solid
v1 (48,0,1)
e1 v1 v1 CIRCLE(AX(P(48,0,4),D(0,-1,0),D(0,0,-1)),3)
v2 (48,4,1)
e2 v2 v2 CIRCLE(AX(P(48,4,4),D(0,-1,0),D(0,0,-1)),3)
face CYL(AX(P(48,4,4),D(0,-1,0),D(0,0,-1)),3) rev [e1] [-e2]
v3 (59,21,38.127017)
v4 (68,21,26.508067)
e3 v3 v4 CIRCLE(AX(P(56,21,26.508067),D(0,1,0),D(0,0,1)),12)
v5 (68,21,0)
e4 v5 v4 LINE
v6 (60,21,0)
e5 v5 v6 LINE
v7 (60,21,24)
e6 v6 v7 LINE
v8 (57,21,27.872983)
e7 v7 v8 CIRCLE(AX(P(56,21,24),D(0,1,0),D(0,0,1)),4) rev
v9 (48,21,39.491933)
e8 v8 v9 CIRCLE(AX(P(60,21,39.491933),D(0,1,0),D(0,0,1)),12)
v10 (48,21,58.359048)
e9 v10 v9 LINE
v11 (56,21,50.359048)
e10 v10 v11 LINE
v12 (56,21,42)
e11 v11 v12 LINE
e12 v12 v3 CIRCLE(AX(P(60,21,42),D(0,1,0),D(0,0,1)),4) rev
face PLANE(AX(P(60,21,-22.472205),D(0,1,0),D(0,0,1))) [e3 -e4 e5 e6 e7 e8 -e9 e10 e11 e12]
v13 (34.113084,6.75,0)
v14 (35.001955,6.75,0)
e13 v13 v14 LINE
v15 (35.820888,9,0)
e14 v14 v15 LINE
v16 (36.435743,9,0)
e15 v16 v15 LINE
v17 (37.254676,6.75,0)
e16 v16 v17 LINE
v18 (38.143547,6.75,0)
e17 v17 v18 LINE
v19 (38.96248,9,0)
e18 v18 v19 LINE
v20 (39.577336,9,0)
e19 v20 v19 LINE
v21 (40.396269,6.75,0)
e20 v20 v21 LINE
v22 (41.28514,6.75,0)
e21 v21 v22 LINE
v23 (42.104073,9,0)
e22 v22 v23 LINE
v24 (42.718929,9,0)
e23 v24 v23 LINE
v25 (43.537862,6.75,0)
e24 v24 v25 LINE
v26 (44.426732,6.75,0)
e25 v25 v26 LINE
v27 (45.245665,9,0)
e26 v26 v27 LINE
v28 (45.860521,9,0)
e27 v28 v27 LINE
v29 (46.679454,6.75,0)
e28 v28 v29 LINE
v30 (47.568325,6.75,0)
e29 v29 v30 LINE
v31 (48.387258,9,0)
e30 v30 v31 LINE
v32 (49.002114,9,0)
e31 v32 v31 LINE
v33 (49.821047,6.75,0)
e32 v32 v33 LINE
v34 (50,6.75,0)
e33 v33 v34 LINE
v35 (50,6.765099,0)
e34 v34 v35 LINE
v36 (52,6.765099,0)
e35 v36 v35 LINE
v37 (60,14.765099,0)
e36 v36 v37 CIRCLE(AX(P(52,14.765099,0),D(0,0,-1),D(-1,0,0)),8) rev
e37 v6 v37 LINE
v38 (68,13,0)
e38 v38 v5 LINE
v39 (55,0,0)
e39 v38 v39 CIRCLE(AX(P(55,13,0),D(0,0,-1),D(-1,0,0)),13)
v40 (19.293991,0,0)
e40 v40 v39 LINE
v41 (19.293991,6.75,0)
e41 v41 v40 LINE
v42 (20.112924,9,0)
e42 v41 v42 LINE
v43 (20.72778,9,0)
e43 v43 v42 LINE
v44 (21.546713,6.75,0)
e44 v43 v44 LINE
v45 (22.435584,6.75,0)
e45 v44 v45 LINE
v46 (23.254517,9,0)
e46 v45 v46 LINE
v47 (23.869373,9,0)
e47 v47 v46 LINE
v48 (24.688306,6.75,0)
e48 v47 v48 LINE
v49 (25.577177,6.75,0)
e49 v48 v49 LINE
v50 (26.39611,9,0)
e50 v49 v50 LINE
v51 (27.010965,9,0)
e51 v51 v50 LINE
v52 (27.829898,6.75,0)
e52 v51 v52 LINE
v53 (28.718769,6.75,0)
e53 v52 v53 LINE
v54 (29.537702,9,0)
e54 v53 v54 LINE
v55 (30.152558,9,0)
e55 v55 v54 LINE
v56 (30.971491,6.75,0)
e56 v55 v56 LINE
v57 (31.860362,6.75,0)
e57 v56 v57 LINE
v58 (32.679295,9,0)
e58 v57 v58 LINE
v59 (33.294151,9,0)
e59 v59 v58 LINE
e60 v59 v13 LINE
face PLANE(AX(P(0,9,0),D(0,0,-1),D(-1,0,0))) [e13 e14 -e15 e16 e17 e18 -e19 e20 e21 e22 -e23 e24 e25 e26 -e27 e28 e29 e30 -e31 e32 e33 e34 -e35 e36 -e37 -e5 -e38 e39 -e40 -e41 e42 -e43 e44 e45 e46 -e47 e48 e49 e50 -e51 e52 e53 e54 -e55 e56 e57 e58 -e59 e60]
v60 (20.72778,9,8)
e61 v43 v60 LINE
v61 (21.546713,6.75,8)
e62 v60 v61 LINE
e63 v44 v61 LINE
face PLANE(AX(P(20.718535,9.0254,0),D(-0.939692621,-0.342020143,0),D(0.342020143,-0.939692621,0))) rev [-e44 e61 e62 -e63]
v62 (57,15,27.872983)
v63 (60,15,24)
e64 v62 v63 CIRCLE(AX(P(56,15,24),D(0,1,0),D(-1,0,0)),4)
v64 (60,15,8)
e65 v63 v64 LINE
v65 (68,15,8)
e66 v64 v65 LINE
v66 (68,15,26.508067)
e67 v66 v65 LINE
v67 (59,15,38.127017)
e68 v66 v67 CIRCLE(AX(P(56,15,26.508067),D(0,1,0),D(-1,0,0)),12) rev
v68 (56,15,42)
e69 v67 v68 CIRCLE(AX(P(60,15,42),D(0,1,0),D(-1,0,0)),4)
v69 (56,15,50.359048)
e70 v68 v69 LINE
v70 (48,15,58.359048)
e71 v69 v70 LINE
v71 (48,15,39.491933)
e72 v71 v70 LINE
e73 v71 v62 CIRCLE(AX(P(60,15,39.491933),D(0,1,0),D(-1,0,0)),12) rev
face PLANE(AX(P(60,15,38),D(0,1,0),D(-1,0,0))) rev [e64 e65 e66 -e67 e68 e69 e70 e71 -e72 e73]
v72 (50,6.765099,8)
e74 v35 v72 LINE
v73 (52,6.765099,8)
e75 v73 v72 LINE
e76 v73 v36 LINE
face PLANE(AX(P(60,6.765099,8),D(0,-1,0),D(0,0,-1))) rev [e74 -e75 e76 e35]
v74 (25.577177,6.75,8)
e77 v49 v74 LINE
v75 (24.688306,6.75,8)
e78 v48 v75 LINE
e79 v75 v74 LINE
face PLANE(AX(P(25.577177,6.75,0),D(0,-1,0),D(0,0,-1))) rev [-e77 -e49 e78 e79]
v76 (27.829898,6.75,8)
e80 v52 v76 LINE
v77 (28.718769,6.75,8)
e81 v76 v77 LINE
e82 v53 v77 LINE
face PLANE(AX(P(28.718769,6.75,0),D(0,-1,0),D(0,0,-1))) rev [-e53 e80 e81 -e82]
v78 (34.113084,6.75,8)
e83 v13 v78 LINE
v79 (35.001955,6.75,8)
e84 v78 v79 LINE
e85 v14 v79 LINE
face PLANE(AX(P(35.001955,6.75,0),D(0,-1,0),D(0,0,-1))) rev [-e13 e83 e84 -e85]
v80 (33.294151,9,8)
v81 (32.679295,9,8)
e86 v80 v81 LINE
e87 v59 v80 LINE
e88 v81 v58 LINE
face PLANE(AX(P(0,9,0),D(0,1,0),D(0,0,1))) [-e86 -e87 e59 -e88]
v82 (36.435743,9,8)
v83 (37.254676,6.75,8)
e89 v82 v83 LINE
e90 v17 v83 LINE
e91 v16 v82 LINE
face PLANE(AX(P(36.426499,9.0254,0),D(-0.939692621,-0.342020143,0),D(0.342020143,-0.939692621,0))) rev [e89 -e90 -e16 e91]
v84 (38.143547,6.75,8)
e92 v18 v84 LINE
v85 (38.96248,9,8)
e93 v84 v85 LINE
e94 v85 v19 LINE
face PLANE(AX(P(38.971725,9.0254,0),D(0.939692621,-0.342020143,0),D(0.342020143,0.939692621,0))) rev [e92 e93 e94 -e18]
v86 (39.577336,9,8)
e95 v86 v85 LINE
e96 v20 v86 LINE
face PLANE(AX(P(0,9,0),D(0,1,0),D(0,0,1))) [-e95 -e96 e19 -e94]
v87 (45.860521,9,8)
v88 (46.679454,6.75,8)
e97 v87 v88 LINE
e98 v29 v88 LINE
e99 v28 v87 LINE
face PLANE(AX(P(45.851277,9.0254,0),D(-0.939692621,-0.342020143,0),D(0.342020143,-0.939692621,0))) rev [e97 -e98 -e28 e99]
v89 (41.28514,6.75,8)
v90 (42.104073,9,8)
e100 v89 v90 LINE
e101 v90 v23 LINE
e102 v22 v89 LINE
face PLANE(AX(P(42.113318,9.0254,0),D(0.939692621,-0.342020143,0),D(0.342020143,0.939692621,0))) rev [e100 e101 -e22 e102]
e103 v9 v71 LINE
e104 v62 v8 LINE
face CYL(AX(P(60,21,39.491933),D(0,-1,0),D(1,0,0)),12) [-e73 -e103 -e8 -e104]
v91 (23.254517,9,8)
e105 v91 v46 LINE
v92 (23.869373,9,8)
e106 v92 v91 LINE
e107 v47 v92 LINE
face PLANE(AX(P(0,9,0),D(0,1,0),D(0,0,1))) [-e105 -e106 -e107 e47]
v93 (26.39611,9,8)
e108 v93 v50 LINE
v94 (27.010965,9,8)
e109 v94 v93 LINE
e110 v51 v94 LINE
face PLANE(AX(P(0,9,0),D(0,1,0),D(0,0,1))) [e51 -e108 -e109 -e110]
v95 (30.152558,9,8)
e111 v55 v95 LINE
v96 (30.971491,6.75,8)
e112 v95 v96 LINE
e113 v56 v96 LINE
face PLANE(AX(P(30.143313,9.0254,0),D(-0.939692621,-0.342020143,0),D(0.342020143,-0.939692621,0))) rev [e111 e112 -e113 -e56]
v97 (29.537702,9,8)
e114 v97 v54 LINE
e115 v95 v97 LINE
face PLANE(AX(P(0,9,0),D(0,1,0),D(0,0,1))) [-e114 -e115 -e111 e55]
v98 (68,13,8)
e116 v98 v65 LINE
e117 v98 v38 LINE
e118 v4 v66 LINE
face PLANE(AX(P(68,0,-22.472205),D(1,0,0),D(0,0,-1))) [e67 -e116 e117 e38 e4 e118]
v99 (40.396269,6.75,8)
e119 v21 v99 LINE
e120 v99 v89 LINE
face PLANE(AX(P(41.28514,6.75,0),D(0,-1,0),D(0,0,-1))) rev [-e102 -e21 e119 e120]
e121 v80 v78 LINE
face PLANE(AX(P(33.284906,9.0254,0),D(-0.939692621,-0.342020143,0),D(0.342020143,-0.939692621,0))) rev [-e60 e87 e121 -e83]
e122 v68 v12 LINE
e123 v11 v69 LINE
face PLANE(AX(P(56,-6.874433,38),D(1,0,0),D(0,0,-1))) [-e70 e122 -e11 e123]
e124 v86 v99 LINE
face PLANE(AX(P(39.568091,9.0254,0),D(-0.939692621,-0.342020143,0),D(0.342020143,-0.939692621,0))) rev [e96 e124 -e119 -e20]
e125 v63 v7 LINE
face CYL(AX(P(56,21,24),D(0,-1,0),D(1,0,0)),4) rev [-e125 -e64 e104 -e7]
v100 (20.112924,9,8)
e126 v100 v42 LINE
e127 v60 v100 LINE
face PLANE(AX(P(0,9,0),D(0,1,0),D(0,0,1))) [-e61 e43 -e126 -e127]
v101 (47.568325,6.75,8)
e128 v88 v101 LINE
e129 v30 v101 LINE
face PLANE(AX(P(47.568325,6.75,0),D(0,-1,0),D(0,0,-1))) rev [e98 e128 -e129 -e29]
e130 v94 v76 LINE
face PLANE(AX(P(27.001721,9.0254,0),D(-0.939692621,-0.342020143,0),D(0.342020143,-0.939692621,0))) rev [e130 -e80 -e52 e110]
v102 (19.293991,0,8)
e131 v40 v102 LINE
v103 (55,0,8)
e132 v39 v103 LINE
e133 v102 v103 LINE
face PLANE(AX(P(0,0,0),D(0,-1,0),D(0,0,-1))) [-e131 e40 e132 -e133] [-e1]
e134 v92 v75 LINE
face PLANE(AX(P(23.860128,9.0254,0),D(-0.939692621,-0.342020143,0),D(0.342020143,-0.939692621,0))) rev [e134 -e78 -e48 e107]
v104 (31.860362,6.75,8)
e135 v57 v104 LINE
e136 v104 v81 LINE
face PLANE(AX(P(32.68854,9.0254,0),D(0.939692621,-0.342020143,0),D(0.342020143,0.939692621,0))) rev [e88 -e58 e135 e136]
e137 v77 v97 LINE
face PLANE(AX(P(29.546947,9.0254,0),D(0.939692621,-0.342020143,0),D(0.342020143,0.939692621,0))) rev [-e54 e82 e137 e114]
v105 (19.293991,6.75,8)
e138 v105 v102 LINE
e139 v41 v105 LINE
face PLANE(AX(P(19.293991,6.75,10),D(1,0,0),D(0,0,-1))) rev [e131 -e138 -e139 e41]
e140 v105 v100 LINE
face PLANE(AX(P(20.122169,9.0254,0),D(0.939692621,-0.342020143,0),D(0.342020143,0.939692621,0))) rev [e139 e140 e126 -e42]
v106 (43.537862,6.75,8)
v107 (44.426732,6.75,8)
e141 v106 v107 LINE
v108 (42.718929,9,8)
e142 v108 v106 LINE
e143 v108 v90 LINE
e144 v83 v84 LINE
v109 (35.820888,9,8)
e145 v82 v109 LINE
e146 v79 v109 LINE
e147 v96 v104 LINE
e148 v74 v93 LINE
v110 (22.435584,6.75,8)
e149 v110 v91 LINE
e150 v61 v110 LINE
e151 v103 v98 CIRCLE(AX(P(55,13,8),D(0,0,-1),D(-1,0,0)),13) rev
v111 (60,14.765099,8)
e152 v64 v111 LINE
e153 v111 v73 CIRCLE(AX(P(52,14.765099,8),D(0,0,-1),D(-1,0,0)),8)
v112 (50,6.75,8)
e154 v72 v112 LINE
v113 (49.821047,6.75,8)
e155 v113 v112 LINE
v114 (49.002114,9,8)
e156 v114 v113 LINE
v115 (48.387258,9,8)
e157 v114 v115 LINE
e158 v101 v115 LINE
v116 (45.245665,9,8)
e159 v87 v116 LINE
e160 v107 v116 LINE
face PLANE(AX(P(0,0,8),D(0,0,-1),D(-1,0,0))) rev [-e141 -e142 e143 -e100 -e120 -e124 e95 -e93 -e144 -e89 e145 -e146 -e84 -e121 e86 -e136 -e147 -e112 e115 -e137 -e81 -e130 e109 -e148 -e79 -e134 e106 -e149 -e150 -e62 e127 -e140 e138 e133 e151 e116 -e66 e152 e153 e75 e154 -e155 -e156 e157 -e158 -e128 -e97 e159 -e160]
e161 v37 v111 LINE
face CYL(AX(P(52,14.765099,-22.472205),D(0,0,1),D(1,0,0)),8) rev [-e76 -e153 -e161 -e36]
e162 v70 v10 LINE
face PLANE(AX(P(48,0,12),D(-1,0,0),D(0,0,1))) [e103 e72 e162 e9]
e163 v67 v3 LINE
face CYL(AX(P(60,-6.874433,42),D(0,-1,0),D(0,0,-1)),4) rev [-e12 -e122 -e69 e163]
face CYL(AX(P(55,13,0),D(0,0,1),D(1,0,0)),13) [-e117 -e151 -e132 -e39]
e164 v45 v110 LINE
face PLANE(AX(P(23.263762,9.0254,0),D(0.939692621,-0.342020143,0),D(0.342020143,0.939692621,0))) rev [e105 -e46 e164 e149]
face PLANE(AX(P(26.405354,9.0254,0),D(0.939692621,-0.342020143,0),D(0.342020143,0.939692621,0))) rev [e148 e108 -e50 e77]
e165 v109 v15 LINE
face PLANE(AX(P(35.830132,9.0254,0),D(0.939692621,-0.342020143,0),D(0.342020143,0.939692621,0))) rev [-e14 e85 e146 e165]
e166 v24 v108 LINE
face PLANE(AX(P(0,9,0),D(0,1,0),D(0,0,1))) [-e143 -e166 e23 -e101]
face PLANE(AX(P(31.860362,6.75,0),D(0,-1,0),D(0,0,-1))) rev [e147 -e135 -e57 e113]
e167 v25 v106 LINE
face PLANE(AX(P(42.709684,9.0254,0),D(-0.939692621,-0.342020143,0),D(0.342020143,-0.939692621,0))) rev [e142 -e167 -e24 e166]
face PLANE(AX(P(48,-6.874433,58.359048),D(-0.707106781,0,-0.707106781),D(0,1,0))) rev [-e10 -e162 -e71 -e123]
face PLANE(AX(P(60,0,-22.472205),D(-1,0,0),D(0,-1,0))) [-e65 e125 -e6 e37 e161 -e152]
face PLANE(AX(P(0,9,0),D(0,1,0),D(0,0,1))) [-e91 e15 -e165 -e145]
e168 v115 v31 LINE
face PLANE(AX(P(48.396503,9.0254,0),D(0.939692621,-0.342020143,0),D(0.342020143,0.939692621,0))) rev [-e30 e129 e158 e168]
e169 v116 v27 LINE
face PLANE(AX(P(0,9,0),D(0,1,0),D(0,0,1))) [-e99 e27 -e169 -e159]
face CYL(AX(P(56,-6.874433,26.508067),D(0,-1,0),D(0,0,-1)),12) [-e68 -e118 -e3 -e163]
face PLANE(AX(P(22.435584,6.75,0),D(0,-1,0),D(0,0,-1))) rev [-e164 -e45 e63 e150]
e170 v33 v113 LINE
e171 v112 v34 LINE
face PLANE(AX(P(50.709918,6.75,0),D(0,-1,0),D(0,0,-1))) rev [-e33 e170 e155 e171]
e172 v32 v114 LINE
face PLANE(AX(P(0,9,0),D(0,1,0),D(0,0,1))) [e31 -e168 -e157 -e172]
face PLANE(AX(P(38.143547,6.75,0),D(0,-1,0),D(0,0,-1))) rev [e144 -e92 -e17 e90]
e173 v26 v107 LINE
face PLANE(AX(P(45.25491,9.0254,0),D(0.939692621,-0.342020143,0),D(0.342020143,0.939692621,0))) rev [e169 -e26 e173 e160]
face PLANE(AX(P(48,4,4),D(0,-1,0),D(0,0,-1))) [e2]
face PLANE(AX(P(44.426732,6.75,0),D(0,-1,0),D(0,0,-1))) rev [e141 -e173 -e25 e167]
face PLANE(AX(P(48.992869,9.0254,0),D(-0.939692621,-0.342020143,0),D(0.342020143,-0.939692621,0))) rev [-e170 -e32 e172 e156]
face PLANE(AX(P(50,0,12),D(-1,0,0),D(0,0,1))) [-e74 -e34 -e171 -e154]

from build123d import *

# Parameters (mm, degrees)
BLANKSKE_W                  = 50
BLANKSKE_H                  = 9
BLANK_DEPTH                 = 12
TOOTHCUTSIM_DEPTH           = 53.201532545
TEETHCUTS_COUNT             = 17
TEETHCUTS_PITCH             = 3.14159265
SKETCH1_W                   = 50
SKETCH1_H                   = 10.518808777
CUT_EXTRUDE1_DEPTH          = 4
SKETCH2_W                   = 8
SKETCH2_H                   = 6.765098998
BOSS_EXTRUDE1_DEPTH         = 10
SKETCH3_W                   = 8
SKETCH3_H                   = 21
BOSS_EXTRUDE2_DEPTH         = 8
SKETCH4_W                   = 8
SKETCH4_H                   = 6
BOSS_EXTRUDE3_DEPTH         = 30
SKETCH5_W                   = 10
SKETCH5_H                   = 6
BOSS_EXTRUDE4_DEPTH         = 12
BODY_MOVE_COPY3_START       = -12
BODY_MOVE_COPY3_DEPTH       = 12
BODY_MOVE_COPY3_START_2     = 16
BODY_MOVE_COPY3_2_OUTLINE_W = 12
BODY_MOVE_COPY3_2_OUTLINE_H = 6
BODY_MOVE_COPY3_2_DEPTH     = 10
BODY_MOVE_COPY3_3_DEPTH     = 8
BODY_MOVE_COPY3_START_3     = 28
BODY_MOVE_COPY3_4_OUTLINE_W = 20
BODY_MOVE_COPY3_4_OUTLINE_H = 6
BODY_MOVE_COPY3_4_DEPTH     = 10
BODY_MOVE_COPY3_START_4     = 26
BODY_MOVE_COPY3_5_OUTLINE_W = 8
BODY_MOVE_COPY3_5_OUTLINE_H = 6
BODY_MOVE_COPY3_5_DEPTH     = 2
SKETCH8_R                   = 3
CUT_EXTRUDE2_DEPTH          = 4
FILLET1_R                   = 8
FILLET2_R                   = 13
SKETCH9_W                   = 8
SKETCH9_H                   = 20.359047751
BOSS_EXTRUDE5_DEPTH         = 6
FILLET3_R                   = 4
FILLET4_R                   = 12
CUT_EXTRUDE3_DEPTH          = 10
SKETCH11_W                  = 0.88887074
SKETCH11_H                  = 6.79103927
CUT_EXTRUDE4_DEPTH          = 10
CHAMFER10_SIZE              = 8


# Read off the part's stored shape, not the designer's step: Body-Move/Copy3
with BuildPart() as part:
    # BlankSke → Blank (new body)
    with BuildSketch(Plane.XY):
        with Locations((25, 4.5)):
            Rectangle(BLANKSKE_W, BLANKSKE_H)
    extrude(amount=-BLANK_DEPTH)

    # TooCutSkeSim → ToothCutSim (cut, through all)
    with BuildSketch(Plane.XY):
        Polygon((0.44443537, 6.75), (-0.44443537, 6.75), (-1.272613241, 9.0254), (1.272613241, 9.0254), align=None)
    toothcutsim = extrude(amount=-TOOTHCUTSIM_DEPTH, mode=Mode.SUBTRACT)

    # TeethCuts: ToothCutSim ×17
    with Locations(*[(i * TEETHCUTS_PITCH, 0, 0) for i in range(1, TEETHCUTS_COUNT)]):
        add(toothcutsim, mode=Mode.SUBTRACT)

    # Sketch1 → Cut-Extrude1 (cut)
    with BuildSketch(Plane.XY):
        with Locations((25, 5.259404389)):
            Rectangle(SKETCH1_W, SKETCH1_H)
    extrude(amount=-CUT_EXTRUDE1_DEPTH, mode=Mode.SUBTRACT)

    # Sketch2 → Boss-Extrude1 (add)
    with BuildSketch(Plane(origin=(50, 0, 0), x_dir=(0, 0, -1), z_dir=(1, 0, 0))):
        with Locations((8, 3.382549499)):
            Rectangle(SKETCH2_W, SKETCH2_H)
    extrude(amount=BOSS_EXTRUDE1_DEPTH)

    # Sketch3 → Boss-Extrude2 (add)
    with BuildSketch(Plane.XY.offset(-4)):
        with Locations((64, 10.5)):
            Rectangle(SKETCH3_W, SKETCH3_H)
    extrude(amount=-BOSS_EXTRUDE2_DEPTH)

    # Sketch4 → Boss-Extrude3 (add)
    with BuildSketch(Plane.XY.offset(-4)):
        with Locations((64, 18)):
            Rectangle(SKETCH4_W, SKETCH4_H)
    extrude(amount=BOSS_EXTRUDE3_DEPTH)

    # Sketch5 → Boss-Extrude4 (add)
    with BuildSketch(Plane.ZY.offset(-60)):
        with Locations((21, 18)):
            Rectangle(SKETCH5_W, SKETCH5_H)
    extrude(amount=BOSS_EXTRUDE4_DEPTH)

    # Body-Move/Copy3 outline → Body-Move/Copy3 (cut)
    with BuildSketch(Plane.XY.offset(BODY_MOVE_COPY3_START)):
        Polygon((68, 21), (60, 21), (60, 6.765098998), (50, 6.765098998), (50, 6.75), (49.82104703, 6.75), (49.002114003, 9), (48.387258147, 9), (47.56832512, 6.75), (46.67945438, 6.75), (45.860521353, 9), (45.245665497, 9), (44.42673247, 6.75), (43.53786173, 6.75), (42.718928703, 9), (42.104072847, 9), (41.28513982, 6.75), (40.39626908, 6.75), (39.577336053, 9), (38.962480197, 9), (38.14354717, 6.75), (37.25467643, 6.75), (36.435743403, 9), (35.820887547, 9), (35.00195452, 6.75), (34.11308378, 6.75), (33.294150753, 9), (32.679294897, 9), (31.86036187, 6.75), (30.97149113, 6.75), (30.152558103, 9), (29.537702247, 9), (28.71876922, 6.75), (27.82989848, 6.75), (27.010965453, 9), (26.396109597, 9), (25.57717657, 6.75), (24.68830583, 6.75), (23.869372803, 9), (23.254516947, 9), (22.43558392, 6.75), (21.54671318, 6.75), (20.727780153, 9), (20.112924297, 9), (19.29399127, 6.75), (18.40512053, 6.75), (17.586187503, 9), (16.971331647, 9), (16.15239862, 6.75), (15.26352788, 6.75), (14.444594853, 9), (13.829738997, 9), (13.01080597, 6.75), (12.12193523, 6.75), (11.303002203, 9), (10.688146347, 9), (9.86921332, 6.75), (8.98034258, 6.75), (8.161409553, 9), (7.546553697, 9), (6.72762067, 6.75), (5.83874993, 6.75), (5.019816903, 9), (4.404961047, 9), (3.58602802, 6.75), (2.69715728, 6.75), (1.878224253, 9), (1.263368397, 9), (0.44443537, 6.75), (0, 6.75), (0, 0), (68, 0), align=None)
    extrude(amount=BODY_MOVE_COPY3_DEPTH, mode=Mode.SUBTRACT)

    # Body-Move_Copy3 2 outline → Body-Move_Copy3 2 (cut)
    with BuildSketch(Plane.XY.offset(BODY_MOVE_COPY3_START_2)):
        with Locations((54, 18)):
            Rectangle(BODY_MOVE_COPY3_2_OUTLINE_W, BODY_MOVE_COPY3_2_OUTLINE_H)
    extrude(amount=BODY_MOVE_COPY3_2_DEPTH, mode=Mode.SUBTRACT)

    # Body-Move_Copy3 3 outline → Body-Move_Copy3 3 (add)
    with BuildSketch(Plane.XY):
        Polygon((68, 15), (60, 15), (60, 6.765098998), (50, 6.765098998), (50, 6.75), (49.82104703, 6.75), (49.002114003, 9), (48.387258147, 9), (47.56832512, 6.75), (46.67945438, 6.75), (45.860521353, 9), (45.245665497, 9), (44.42673247, 6.75), (43.53786173, 6.75), (42.718928703, 9), (42.104072847, 9), (41.28513982, 6.75), (40.39626908, 6.75), (39.577336053, 9), (38.962480197, 9), (38.14354717, 6.75), (37.25467643, 6.75), (36.435743403, 9), (35.820887547, 9), (35.00195452, 6.75), (34.11308378, 6.75), (33.294150753, 9), (32.679294897, 9), (31.86036187, 6.75), (30.97149113, 6.75), (30.152558103, 9), (29.537702247, 9), (28.71876922, 6.75), (27.82989848, 6.75), (27.010965453, 9), (26.396109597, 9), (25.57717657, 6.75), (24.68830583, 6.75), (23.869372803, 9), (23.254516947, 9), (22.43558392, 6.75), (21.54671318, 6.75), (20.727780153, 9), (20.112924297, 9), (19.29399127, 6.75), (18.40512053, 6.75), (17.586187503, 9), (16.971331647, 9), (16.15239862, 6.75), (15.26352788, 6.75), (14.444594853, 9), (13.829738997, 9), (13.01080597, 6.75), (12.12193523, 6.75), (11.303002203, 9), (10.688146347, 9), (9.86921332, 6.75), (8.98034258, 6.75), (8.161409553, 9), (7.546553697, 9), (6.72762067, 6.75), (5.83874993, 6.75), (5.019816903, 9), (4.404961047, 9), (3.58602802, 6.75), (2.69715728, 6.75), (1.878224253, 9), (1.263368397, 9), (0.44443537, 6.75), (0, 6.75), (0, 0), (68, 0), align=None)
    extrude(amount=BODY_MOVE_COPY3_3_DEPTH)



with BuildPart() as body_2:
    # Body-Move_Copy3 4 outline → Body-Move_Copy3 4 (new body)
    with BuildSketch(Plane.XY.offset(BODY_MOVE_COPY3_START_3)):
        with Locations((58, 18)):
            Rectangle(BODY_MOVE_COPY3_4_OUTLINE_W, BODY_MOVE_COPY3_4_OUTLINE_H)
    extrude(amount=BODY_MOVE_COPY3_4_DEPTH)


with BuildPart() as part_1:
    add(part.part)

    add(body_2.part)  # Body-Move_Copy3 5 merges body 2
    # Body-Move_Copy3 5 outline → Body-Move_Copy3 5 (add)
    with BuildSketch(Plane.XY.offset(BODY_MOVE_COPY3_START_4)):
        with Locations((64, 18)):
            Rectangle(BODY_MOVE_COPY3_5_OUTLINE_W, BODY_MOVE_COPY3_5_OUTLINE_H)
    extrude(amount=BODY_MOVE_COPY3_5_DEPTH)

    # Sketch8 → Cut-Extrude2 (cut)
    with BuildSketch(Plane.XZ):
        with Locations(Location((48, 4, 0), (0, 0, 270))):
            Circle(SKETCH8_R)
    extrude(amount=-CUT_EXTRUDE2_DEPTH, mode=Mode.SUBTRACT)

    # Fillet1
    fillet1_edges = [part_1.edges().sort_by_distance(p)[0] for p in [
        (60, 6.765098998, 4),
    ]]
    fillet(fillet1_edges, radius=FILLET1_R)

    # Fillet2
    fillet2_edges = [part_1.edges().sort_by_distance(p)[0] for p in [
        (68, 0, 4),
    ]]
    fillet(fillet2_edges, radius=FILLET2_R)

    # Sketch9 → Boss-Extrude5 (add)
    with BuildSketch(Plane(origin=(0, 21, 0), x_dir=(1, 0, 0), z_dir=(0, 1, 0))):
        with Locations((52, -48.179523876)):
            Rectangle(SKETCH9_W, SKETCH9_H)
    extrude(amount=-BOSS_EXTRUDE5_DEPTH)

    # Fillet3
    fillet3_edges = [part_1.edges().sort_by_distance(p)[0] for p in [
        (60, 18, 28),
        (56, 18, 38),
    ]]
    fillet(fillet3_edges, radius=FILLET3_R)

    # Fillet4
    fillet4_edges = [part_1.edges().sort_by_distance(p)[0] for p in [
        (48, 18, 28),
        (68, 18, 38),
    ]]
    fillet(fillet4_edges, radius=FILLET4_R)

    # Sketch10 → Cut-Extrude3 (cut)
    with BuildSketch(Plane(origin=(0, 0, 0), x_dir=(-1, 0, 0), z_dir=(0, 0, -1))):
        Polygon((-18.40512053, 6.75), (-18.40512053, 0), (5.217531279, 0), (5.217531279, 6.75), (5.217531279, 11.737070905), (-18.40512053, 11.737070905), align=None)
    extrude(amount=-CUT_EXTRUDE3_DEPTH, mode=Mode.SUBTRACT)

    # Sketch11 → Cut-Extrude4 (cut)
    with BuildSketch(Plane(origin=(0, 0, 0), x_dir=(-1, 0, 0), z_dir=(0, 0, -1))):
        with Locations((-18.8495559, 3.354480365)):
            Rectangle(SKETCH11_W, SKETCH11_H)
    extrude(amount=-CUT_EXTRUDE4_DEPTH, mode=Mode.SUBTRACT)

    # Chamfer10
    chamfer10_edges = [part_1.edges().sort_by_distance(p)[0] for p in [
        (56, 18, 58.359047751),
    ]]
    chamfer(chamfer10_edges, length=CHAMFER10_SIZE - 0.0001)  # a hair under: the kernel refuses the full size


solid = part_1.part
